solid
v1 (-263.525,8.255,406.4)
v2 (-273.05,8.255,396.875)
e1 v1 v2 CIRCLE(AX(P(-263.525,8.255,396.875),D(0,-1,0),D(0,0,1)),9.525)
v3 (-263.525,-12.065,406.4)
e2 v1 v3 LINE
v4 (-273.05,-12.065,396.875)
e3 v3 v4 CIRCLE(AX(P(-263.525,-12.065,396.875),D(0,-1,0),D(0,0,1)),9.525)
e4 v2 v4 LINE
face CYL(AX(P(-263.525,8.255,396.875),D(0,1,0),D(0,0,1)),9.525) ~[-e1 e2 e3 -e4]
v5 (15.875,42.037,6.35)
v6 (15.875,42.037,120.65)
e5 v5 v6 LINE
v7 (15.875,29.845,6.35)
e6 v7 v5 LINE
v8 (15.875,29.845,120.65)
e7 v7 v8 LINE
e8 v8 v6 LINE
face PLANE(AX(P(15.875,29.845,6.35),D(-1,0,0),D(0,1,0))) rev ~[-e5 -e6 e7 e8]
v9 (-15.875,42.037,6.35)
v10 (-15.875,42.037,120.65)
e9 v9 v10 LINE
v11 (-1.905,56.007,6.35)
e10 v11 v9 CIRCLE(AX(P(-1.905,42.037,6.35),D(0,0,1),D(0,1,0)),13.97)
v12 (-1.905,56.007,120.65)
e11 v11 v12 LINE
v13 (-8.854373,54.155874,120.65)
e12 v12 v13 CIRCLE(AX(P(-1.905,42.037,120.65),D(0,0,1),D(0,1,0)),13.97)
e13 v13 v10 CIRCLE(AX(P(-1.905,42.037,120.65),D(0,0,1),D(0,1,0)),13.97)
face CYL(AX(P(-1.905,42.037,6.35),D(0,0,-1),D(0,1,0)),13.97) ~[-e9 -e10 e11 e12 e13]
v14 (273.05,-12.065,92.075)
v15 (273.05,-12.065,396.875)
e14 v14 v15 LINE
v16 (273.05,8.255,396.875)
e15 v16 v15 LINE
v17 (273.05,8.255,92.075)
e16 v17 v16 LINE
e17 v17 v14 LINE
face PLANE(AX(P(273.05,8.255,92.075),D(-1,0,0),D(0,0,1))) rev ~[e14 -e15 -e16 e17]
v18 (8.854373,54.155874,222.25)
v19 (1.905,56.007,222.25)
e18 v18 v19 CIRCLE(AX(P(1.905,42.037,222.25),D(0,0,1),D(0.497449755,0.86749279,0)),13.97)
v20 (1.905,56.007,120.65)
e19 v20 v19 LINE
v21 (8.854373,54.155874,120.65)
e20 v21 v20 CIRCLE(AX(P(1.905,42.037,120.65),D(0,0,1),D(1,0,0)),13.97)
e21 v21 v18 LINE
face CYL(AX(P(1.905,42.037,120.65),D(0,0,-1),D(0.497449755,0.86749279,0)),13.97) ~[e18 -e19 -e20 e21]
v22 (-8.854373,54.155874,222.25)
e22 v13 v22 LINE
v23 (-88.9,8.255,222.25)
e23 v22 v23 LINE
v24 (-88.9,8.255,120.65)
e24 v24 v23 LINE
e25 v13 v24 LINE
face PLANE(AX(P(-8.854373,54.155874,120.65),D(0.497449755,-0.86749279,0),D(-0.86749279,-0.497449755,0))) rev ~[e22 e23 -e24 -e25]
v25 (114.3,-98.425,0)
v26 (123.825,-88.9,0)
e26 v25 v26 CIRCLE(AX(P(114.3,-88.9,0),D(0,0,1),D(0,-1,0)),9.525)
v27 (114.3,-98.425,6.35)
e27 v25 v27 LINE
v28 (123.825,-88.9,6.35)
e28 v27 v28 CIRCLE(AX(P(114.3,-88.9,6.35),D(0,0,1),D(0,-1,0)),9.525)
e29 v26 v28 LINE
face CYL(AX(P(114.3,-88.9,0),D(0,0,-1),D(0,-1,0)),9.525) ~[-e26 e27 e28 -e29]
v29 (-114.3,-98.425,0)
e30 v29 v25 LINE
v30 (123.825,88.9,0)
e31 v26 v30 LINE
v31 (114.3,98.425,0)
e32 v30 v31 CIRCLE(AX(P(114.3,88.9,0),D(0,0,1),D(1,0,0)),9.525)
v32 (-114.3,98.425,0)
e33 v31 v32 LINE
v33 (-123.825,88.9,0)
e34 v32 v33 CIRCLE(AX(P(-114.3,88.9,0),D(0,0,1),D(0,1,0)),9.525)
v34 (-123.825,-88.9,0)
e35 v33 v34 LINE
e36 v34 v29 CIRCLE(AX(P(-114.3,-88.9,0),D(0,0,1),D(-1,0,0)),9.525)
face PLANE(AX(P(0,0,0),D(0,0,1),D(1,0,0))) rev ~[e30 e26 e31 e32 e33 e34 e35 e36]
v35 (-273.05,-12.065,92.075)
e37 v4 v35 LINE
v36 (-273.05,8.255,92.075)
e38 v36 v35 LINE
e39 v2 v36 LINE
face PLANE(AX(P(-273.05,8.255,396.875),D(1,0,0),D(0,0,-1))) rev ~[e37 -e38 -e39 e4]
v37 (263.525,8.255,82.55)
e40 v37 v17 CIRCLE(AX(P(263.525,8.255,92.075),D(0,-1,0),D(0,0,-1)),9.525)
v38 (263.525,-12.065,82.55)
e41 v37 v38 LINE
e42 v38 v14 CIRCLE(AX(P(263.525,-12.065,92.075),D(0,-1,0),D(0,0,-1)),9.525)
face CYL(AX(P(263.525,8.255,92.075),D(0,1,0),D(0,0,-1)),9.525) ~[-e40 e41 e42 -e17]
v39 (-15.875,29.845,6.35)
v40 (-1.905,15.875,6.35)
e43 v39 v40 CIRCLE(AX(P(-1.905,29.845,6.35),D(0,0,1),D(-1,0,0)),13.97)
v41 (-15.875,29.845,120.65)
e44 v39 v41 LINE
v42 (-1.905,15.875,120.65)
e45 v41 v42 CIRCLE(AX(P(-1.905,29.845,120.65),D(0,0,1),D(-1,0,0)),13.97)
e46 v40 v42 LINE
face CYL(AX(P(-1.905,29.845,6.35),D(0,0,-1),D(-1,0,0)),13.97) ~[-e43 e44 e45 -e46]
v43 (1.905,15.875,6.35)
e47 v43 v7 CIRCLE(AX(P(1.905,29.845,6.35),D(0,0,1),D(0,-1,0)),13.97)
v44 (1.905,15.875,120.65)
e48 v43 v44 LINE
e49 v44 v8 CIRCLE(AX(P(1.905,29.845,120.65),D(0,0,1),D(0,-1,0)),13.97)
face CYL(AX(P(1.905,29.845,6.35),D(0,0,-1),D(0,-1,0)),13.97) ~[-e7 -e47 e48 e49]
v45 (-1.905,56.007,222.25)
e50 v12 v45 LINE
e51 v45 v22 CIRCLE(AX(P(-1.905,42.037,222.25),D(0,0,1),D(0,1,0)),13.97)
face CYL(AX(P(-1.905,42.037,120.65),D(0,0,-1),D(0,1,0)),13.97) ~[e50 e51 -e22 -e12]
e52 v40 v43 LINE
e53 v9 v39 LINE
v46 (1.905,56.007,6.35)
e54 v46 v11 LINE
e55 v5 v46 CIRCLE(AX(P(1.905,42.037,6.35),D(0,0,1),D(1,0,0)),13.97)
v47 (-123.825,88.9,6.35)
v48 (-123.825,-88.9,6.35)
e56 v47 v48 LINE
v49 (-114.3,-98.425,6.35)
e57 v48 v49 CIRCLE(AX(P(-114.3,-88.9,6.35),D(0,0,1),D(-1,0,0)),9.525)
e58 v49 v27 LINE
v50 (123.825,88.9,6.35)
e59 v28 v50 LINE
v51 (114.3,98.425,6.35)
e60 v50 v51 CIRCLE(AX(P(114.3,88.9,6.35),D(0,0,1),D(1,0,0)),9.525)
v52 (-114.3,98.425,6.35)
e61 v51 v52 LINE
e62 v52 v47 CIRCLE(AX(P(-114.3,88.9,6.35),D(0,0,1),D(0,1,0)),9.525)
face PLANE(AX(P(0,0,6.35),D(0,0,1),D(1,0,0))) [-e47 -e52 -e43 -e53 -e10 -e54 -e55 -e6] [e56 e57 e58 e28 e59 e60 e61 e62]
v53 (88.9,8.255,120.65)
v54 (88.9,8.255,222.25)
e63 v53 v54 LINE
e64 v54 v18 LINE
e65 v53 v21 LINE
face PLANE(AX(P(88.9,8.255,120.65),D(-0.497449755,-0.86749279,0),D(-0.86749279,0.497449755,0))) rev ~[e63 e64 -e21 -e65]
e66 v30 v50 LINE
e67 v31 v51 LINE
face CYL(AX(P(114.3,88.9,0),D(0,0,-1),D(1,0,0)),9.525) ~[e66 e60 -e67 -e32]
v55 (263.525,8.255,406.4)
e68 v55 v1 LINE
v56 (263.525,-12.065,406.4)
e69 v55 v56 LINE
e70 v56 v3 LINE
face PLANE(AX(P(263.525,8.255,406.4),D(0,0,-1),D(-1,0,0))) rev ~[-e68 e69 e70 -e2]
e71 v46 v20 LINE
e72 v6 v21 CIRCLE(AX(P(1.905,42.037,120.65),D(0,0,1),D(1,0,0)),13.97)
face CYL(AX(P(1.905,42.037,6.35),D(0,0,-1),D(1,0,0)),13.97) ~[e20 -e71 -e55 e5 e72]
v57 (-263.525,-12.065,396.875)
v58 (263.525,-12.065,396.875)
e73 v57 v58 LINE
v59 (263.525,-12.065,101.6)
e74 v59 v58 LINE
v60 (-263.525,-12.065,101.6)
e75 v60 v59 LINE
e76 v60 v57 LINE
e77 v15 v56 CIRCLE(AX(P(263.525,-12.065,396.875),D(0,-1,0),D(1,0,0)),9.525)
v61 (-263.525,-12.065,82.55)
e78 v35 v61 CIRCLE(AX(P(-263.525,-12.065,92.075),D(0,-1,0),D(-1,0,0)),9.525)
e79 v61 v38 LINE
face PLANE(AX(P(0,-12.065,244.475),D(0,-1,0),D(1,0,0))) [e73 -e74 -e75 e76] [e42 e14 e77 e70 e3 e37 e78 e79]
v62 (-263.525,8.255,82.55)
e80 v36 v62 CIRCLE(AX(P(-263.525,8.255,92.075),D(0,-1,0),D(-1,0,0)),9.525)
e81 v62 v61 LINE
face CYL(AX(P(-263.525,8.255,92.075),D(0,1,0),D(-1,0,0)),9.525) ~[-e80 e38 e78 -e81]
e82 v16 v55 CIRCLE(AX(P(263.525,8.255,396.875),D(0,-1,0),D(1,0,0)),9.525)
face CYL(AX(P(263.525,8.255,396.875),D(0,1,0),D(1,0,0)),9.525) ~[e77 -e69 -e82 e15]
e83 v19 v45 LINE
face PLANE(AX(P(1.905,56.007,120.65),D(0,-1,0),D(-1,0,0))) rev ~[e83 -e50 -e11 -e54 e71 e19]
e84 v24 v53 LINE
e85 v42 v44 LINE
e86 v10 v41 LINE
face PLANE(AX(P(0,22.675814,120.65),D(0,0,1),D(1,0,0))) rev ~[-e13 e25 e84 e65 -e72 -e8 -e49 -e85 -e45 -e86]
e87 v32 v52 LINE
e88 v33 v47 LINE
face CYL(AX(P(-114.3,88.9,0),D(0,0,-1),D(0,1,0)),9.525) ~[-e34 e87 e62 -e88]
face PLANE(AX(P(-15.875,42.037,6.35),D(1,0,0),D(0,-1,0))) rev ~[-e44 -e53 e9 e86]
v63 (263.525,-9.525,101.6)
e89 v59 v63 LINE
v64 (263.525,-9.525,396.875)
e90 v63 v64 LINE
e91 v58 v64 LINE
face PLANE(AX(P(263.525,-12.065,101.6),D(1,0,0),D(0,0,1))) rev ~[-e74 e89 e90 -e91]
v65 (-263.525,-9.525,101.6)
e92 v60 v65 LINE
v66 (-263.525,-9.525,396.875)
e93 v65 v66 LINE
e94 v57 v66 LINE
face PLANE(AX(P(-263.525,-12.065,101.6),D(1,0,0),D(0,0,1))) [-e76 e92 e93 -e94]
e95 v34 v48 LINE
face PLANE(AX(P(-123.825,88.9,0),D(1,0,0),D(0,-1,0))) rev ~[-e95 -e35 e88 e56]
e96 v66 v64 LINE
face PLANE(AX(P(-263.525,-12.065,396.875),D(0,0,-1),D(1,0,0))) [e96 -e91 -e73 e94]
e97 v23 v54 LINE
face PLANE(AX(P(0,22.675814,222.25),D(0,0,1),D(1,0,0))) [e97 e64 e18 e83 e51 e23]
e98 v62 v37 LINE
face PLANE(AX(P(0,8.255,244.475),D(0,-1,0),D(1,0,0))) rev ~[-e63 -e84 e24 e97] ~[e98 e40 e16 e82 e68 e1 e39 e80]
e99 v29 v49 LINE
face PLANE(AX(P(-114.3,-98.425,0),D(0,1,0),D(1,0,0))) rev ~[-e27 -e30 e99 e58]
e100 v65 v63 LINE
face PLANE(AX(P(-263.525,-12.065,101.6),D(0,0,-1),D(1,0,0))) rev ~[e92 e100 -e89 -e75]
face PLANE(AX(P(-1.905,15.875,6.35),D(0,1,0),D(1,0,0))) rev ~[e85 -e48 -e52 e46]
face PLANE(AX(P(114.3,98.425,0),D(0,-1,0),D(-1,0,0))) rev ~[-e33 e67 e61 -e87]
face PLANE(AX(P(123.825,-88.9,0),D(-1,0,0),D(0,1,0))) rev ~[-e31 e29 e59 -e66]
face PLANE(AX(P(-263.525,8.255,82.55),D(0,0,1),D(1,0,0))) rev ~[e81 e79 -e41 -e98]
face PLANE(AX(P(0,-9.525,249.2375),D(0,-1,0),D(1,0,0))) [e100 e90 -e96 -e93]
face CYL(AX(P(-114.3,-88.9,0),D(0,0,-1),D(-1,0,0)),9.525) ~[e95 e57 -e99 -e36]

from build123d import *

# Parameters (mm, degrees)
F1_DEPTH = 6.35
F3_DEPTH = 114.3
F5_DEPTH = 101.6
F7_DEPTH = 20.32
F8_W     = 527.05
F8_H     = 295.275
F9_DEPTH = 2.54


with BuildPart() as f1:
    # F0 (on Top) → F1 (new body)
    with BuildSketch(Plane.XY):
        with BuildLine():
            Line((-114.3, -98.425), (114.3, -98.425))
            ThreePointArc((114.3, -98.425), (121.0351920908, -95.6351920908), (123.825, -88.9))
            Line((123.825, -88.9), (123.825, 88.9))
            ThreePointArc((123.825, 88.9), (121.0351920908, 95.6351920908), (114.3, 98.425))
            Line((114.3, 98.425), (-114.3, 98.425))
            ThreePointArc((-114.3, 98.425), (-121.0351920908, 95.6351920908), (-123.825, 88.9))
            Line((-123.825, 88.9), (-123.825, -88.9))
            ThreePointArc((-123.825, -88.9), (-121.0351920908, -95.6351920908), (-114.3, -98.425))
        make_face()
    extrude(amount=F1_DEPTH)

    # F2 (on face) → F3 (join)
    with BuildSketch(Plane.XY.offset(6.35)):
        with BuildLine():
            Line((-1.905, 15.875), (1.905, 15.875))
            ThreePointArc((1.905, 15.875), (11.7832817332, 19.9667182668), (15.875, 29.845))
            Line((15.875, 29.845), (15.875, 42.037))
            ThreePointArc((15.875, 42.037), (11.7832817332, 51.9152817332), (1.905, 56.007))
            Line((1.905, 56.007), (-1.905, 56.007))
            ThreePointArc((-1.905, 56.007), (-11.7832817332, 51.9152817332), (-15.875, 42.037))
            Line((-15.875, 42.037), (-15.875, 29.845))
            ThreePointArc((-15.875, 29.845), (-11.7832817332, 19.9667182668), (-1.905, 15.875))
        make_face()
    extrude(amount=F3_DEPTH)

    # F4 (on face) → F5 (join)
    with BuildSketch(Plane.XY.offset(120.65)):
        with BuildLine():
            ThreePointArc((-15.875, 42.037), (-13.9930859093, 49.0397908043), (-8.8543730782, 54.1558742802))
            Line((-8.8543730782, 54.1558742802), (-88.9, 8.255))
            Line((-88.9, 8.255), (88.9, 8.255))
            Line((88.9, 8.255), (8.8543730782, 54.1558742802))
            ThreePointArc((8.8543730782, 54.1558742802), (13.9930859093, 49.0397908043), (15.875, 42.037))
            Line((15.875, 42.037), (15.875, 29.845))
            ThreePointArc((15.875, 29.845), (11.7832817332, 19.9667182668), (1.905, 15.875))
            Line((1.905, 15.875), (-1.905, 15.875))
            ThreePointArc((-1.905, 15.875), (-11.7832817332, 19.9667182668), (-15.875, 29.845))
            Line((-15.875, 29.845), (-15.875, 42.037))
        make_face()
        with BuildLine():
            ThreePointArc((-1.905, 56.007), (-5.5008466531, 55.536288383), (-8.8543730782, 54.1558742802))
            ThreePointArc((-8.8543730782, 54.1558742802), (-13.9930859093, 49.0397908043), (-15.875, 42.037))
            Line((-15.875, 42.037), (-15.875, 29.845))
            ThreePointArc((-15.875, 29.845), (-11.7832817332, 19.9667182668), (-1.905, 15.875))
            Line((-1.905, 15.875), (1.905, 15.875))
            ThreePointArc((1.905, 15.875), (11.7832817332, 19.9667182668), (15.875, 29.845))
            Line((15.875, 29.845), (15.875, 42.037))
            ThreePointArc((15.875, 42.037), (13.9930859093, 49.0397908043), (8.8543730782, 54.1558742802))
            ThreePointArc((8.8543730782, 54.1558742802), (5.5008466531, 55.536288383), (1.905, 56.007))
            Line((1.905, 56.007), (-1.905, 56.007))
        make_face()
    extrude(amount=F5_DEPTH)

    # F6 (on face) → F7 (join)
    with BuildSketch(Plane.XZ.offset(-8.255)):
        with BuildLine():
            Line((263.525, 406.4), (-263.525, 406.4))
            ThreePointArc((-263.525, 406.4), (-270.2601920908, 403.6101920908), (-273.05, 396.875))
            Line((-273.05, 396.875), (-273.05, 92.075))
            ThreePointArc((-273.05, 92.075), (-270.2601920908, 85.3398079092), (-263.525, 82.55))
            Line((-263.525, 82.55), (263.525, 82.55))
            ThreePointArc((263.525, 82.55), (270.2601920908, 85.3398079092), (273.05, 92.075))
            Line((273.05, 92.075), (273.05, 396.875))
            ThreePointArc((273.05, 396.875), (270.2601920908, 403.6101920908), (263.525, 406.4))
        make_face()
    extrude(amount=F7_DEPTH)

    # F8 (on face) → F9 (cut)
    with BuildSketch(Plane.XZ.offset(12.065)):
        with Locations((0, 249.2375)):
            Rectangle(F8_W, F8_H)
    extrude(amount=-F9_DEPTH, mode=Mode.SUBTRACT)


solid = f1.part
